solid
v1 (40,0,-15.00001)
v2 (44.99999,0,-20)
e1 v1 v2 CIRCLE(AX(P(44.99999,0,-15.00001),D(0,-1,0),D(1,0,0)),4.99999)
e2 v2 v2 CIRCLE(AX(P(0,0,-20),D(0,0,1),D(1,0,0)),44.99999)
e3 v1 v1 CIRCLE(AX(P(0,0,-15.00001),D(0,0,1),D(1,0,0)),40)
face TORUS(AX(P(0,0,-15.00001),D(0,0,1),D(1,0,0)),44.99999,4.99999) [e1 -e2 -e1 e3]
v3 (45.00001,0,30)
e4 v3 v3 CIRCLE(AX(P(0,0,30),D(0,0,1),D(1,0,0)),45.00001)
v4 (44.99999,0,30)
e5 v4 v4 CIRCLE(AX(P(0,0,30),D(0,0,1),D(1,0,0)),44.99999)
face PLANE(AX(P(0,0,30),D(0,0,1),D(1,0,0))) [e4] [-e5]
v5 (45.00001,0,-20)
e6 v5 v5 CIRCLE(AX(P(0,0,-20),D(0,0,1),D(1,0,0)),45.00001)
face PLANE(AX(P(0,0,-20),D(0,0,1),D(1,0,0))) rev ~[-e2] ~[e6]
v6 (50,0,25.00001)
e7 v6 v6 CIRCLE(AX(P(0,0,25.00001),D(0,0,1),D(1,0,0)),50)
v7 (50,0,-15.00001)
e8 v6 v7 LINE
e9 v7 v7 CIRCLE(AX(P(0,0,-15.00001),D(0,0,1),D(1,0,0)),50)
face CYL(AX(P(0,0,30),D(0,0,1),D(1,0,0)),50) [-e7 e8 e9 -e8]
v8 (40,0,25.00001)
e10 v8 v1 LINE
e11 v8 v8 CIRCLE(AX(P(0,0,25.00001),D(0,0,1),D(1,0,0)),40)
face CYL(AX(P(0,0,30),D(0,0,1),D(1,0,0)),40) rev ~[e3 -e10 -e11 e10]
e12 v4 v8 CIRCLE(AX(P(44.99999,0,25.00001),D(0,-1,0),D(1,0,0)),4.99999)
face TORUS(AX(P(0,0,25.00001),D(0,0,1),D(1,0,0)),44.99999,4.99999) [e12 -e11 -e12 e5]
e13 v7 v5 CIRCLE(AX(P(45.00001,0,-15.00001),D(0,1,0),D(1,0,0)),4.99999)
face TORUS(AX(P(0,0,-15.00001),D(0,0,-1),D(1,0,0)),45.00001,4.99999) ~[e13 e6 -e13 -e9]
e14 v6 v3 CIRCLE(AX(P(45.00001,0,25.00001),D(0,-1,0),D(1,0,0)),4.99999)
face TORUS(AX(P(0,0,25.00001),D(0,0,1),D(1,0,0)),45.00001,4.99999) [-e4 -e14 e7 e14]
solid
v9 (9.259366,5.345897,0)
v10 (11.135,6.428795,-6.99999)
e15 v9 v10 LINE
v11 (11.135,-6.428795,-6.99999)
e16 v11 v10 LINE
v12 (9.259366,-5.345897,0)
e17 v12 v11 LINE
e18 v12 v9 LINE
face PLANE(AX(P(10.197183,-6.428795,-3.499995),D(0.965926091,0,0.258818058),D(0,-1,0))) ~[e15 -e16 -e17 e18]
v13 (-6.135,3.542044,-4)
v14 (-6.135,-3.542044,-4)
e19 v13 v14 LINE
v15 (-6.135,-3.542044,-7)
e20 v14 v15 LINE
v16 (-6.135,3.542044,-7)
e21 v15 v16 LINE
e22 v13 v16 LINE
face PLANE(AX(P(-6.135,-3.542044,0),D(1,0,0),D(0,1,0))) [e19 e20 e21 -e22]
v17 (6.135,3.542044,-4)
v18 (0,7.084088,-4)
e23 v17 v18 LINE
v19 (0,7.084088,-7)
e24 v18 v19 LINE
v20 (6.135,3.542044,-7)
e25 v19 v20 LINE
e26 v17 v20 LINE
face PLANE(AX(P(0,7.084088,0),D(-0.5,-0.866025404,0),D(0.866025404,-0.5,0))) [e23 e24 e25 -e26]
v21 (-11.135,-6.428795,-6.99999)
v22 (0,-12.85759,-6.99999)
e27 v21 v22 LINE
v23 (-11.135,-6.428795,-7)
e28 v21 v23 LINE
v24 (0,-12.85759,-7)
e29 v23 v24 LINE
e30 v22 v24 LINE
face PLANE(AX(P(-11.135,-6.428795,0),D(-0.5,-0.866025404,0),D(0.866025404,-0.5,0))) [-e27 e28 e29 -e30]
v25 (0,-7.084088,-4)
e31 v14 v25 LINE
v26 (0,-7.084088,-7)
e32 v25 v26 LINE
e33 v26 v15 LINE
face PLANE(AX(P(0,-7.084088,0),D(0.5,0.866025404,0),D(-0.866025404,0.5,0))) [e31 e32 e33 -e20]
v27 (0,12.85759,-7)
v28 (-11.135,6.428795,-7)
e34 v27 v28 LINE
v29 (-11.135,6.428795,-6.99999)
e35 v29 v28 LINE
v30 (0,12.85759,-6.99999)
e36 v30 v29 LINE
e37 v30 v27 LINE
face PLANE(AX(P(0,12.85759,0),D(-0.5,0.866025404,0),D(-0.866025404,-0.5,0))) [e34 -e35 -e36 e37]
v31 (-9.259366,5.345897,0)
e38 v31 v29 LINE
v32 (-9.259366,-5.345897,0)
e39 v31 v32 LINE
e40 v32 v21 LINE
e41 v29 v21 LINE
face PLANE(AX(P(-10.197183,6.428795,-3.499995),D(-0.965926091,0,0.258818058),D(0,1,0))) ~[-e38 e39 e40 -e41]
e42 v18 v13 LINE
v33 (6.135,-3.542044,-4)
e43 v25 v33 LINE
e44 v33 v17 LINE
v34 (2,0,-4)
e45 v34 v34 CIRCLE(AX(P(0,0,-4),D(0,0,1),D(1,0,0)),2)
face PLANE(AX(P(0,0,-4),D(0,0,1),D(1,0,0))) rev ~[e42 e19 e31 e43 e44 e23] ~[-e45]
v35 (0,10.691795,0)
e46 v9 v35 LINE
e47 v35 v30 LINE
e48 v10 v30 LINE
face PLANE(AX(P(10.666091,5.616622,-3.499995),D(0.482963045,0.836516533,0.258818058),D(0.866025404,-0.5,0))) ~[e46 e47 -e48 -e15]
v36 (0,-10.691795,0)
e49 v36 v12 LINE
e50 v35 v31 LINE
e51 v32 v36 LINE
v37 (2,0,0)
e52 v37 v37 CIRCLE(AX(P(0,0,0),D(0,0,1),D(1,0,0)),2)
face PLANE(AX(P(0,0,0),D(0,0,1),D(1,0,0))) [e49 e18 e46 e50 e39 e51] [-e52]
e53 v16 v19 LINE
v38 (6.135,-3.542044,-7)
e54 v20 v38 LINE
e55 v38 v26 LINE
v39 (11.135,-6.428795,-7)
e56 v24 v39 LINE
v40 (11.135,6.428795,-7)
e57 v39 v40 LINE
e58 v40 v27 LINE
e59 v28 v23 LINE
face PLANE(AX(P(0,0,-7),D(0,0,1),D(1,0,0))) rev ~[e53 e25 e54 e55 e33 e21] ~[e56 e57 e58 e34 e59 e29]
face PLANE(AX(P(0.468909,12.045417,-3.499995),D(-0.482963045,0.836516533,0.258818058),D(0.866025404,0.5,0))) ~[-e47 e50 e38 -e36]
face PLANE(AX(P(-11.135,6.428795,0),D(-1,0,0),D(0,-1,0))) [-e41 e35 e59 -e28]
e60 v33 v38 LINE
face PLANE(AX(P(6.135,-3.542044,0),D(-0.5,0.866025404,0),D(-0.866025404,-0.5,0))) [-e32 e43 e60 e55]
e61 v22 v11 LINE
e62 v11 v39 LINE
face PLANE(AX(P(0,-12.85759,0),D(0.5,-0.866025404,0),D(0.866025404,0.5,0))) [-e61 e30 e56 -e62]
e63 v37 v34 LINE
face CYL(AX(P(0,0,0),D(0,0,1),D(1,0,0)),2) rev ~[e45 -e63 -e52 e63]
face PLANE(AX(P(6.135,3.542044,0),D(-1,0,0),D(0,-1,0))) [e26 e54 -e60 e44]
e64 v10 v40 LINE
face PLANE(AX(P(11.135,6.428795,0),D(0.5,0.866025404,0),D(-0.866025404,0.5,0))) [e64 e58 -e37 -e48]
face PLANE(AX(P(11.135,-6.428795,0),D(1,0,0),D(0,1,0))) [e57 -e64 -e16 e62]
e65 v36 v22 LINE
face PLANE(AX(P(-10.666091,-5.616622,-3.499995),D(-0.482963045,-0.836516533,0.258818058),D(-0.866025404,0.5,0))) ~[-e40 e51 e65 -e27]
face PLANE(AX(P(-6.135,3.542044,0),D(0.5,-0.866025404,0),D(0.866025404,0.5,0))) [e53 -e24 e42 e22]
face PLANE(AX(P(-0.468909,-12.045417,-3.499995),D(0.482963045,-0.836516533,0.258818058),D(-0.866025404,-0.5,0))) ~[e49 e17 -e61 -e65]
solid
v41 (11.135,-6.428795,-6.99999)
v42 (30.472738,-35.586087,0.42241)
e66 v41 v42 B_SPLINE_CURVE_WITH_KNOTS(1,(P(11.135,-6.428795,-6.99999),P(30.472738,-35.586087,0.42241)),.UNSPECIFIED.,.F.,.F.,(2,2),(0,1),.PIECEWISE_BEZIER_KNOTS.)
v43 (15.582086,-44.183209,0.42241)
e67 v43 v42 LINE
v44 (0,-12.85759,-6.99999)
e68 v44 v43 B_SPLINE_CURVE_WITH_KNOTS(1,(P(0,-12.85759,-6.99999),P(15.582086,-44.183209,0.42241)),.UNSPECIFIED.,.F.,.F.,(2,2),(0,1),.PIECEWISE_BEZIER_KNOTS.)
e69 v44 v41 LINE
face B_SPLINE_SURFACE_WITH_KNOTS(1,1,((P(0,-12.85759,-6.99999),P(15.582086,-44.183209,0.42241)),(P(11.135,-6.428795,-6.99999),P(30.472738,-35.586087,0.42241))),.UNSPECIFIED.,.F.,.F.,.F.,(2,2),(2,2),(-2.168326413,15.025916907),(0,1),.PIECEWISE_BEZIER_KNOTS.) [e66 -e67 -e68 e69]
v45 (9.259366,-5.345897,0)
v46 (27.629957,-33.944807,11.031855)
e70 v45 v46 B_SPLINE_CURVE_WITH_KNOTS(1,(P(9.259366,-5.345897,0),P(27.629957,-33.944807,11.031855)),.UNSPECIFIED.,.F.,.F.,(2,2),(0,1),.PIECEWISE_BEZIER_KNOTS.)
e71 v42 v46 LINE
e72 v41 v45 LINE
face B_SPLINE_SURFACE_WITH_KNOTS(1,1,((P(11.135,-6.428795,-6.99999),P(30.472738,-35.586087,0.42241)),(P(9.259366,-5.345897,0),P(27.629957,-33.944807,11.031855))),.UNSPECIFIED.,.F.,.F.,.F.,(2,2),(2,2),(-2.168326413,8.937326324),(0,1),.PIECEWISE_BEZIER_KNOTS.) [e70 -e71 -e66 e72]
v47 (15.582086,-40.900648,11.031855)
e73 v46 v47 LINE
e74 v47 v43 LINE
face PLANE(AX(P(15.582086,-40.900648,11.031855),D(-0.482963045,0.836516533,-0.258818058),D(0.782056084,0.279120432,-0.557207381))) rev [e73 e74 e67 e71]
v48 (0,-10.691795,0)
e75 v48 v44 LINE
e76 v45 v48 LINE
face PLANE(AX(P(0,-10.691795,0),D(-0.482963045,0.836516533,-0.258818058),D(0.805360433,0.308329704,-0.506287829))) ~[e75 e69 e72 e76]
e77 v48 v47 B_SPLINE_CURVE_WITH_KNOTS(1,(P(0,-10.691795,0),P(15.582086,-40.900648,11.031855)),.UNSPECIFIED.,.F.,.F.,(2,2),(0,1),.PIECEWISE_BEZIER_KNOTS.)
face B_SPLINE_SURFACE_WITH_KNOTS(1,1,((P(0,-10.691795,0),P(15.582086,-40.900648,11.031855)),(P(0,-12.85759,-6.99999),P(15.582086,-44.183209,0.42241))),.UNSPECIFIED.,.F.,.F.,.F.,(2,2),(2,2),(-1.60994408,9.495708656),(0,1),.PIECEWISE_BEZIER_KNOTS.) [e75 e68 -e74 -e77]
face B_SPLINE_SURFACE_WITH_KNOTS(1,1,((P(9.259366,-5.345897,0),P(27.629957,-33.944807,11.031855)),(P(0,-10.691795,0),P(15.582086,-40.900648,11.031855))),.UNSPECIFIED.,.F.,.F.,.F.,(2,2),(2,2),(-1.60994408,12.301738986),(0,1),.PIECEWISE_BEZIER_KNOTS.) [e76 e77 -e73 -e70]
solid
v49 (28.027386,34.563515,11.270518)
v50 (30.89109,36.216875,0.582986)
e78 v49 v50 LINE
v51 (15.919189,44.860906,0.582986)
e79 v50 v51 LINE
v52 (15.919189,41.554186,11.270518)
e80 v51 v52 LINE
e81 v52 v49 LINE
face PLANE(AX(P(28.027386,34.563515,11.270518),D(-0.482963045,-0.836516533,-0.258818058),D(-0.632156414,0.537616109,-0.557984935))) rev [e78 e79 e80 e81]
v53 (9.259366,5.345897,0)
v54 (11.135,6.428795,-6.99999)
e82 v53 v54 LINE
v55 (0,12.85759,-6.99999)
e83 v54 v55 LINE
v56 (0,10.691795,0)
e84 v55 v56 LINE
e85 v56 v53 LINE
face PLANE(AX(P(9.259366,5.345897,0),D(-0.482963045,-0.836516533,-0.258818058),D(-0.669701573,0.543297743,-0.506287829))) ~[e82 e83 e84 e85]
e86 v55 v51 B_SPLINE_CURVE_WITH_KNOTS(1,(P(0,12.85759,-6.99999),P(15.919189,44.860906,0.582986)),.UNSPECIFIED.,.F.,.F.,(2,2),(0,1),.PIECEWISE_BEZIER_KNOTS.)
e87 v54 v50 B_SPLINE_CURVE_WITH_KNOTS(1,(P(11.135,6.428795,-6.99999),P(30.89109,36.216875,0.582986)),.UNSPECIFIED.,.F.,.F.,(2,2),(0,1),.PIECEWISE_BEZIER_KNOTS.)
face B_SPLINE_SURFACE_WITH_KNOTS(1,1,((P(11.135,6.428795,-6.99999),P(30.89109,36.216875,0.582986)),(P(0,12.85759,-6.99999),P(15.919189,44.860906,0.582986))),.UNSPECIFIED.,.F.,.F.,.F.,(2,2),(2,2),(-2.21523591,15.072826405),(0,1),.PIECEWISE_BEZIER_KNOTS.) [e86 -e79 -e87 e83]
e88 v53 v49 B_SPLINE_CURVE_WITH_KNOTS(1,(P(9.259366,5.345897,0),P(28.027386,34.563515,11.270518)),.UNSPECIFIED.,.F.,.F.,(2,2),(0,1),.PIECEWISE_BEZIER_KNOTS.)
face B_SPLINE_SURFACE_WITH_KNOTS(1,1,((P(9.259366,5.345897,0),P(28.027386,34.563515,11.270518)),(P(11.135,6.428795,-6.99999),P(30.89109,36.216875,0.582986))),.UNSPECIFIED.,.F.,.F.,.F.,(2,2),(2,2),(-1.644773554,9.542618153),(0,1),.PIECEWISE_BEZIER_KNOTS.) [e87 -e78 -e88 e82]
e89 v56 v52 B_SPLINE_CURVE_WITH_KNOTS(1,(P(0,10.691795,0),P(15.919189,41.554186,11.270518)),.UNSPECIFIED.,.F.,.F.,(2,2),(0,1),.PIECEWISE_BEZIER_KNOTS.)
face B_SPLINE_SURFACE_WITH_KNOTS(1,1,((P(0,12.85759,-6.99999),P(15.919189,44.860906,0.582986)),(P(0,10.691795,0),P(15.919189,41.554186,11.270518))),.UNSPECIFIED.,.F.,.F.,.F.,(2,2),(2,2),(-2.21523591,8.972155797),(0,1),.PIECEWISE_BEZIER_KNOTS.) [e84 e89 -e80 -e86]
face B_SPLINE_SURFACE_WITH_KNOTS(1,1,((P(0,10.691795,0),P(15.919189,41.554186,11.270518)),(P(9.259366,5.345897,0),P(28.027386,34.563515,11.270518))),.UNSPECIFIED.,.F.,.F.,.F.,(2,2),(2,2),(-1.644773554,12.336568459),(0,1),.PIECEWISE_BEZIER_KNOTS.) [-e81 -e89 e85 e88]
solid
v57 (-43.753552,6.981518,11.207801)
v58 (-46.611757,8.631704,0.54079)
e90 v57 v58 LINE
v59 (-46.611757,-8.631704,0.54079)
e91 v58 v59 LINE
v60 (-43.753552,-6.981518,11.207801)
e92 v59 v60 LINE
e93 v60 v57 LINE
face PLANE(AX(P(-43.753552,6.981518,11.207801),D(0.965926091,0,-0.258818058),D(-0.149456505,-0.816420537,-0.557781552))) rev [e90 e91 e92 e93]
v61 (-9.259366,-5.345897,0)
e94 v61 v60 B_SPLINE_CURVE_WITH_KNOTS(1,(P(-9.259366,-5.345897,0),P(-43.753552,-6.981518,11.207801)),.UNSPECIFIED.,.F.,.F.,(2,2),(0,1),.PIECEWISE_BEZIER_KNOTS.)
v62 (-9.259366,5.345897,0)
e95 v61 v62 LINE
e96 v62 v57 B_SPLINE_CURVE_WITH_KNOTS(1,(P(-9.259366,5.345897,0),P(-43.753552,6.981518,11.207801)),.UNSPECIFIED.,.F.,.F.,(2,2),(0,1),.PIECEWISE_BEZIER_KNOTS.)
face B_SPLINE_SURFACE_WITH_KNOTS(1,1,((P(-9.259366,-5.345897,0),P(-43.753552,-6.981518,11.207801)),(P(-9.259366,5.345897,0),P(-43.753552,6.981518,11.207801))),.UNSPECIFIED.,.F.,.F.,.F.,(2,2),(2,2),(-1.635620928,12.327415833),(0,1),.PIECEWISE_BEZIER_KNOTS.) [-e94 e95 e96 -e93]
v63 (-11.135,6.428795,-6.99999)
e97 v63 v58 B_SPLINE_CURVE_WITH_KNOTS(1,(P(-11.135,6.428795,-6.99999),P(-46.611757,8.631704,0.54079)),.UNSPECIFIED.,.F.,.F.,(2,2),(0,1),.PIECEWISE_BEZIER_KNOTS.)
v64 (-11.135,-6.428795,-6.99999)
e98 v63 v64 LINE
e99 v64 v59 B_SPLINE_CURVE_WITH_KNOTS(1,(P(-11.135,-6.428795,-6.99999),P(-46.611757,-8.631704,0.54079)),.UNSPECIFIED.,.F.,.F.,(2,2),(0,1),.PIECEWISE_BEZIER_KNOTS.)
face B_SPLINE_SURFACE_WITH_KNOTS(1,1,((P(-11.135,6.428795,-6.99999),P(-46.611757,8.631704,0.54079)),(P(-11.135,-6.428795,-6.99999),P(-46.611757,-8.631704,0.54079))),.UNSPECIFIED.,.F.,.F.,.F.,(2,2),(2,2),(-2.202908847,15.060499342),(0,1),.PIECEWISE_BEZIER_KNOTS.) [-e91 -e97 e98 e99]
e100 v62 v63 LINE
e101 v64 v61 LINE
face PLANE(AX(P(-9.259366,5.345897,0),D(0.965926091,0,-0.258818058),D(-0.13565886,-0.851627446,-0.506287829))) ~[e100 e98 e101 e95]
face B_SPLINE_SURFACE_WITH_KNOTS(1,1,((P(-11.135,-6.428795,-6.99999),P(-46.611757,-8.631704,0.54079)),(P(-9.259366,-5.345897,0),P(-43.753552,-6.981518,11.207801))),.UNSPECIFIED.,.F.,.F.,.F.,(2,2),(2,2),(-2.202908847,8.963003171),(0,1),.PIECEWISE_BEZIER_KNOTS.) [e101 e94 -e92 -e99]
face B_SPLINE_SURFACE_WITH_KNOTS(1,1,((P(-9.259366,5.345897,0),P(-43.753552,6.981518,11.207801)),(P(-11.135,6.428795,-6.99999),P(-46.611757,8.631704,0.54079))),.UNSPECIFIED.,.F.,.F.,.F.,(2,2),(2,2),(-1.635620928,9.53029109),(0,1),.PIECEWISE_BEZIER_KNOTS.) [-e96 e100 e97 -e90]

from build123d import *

# Parameters (mm, degrees)
F2_R      = 50
F2_R_2    = 40
F3_DEPTH  = 50
F0_R      = 5.0478433235
F4_DEPTH  = 4
F5_DEPTH  = 7
F0_R_2    = 2
F6_DEPTH  = 58.6
F7_R      = 4.99999
F8_R      = 4.99999
F9_DEPTH  = 4
F10_SIZE2 = 6.99999
F10_SIZE  = 1.875634
F11_DEPTH = 36.4222936332
F11_TAPER = -3
F12_DEPTH = 35.6510207057
F12_TAPER = -3
F13_DEPTH = 36.2196154892
F13_TAPER = -3


# Not quite as in the source:
# - a fillet or chamfer is up to 0.001 mm smaller than in the source, because OpenCascade refuses the exact size


with BuildPart() as f3:
    # F2 (on offset) → F3 (new body)
    with BuildSketch(Plane.XY.offset(30)):
        Circle(F2_R)
        Circle(F2_R_2, mode=Mode.SUBTRACT)
    extrude(amount=-F3_DEPTH)

    # F0 (on Top) → F6 (cut)
    with BuildSketch(Plane.XY):
        Circle(F0_R_2)
    extrude(amount=F6_DEPTH, mode=Mode.SUBTRACT)

    # F7 (radius 5 in the source; OpenCascade refuses exactly that, so slightly less here)
    f7_edges = [f3.edges().sort_by_distance(p)[0] for p in [
        (-40, 0, -20),
        (-50, 0, -20),
    ]]
    fillet(f7_edges, radius=F7_R)

    # F8 (radius 5 in the source; OpenCascade refuses exactly that, so slightly less here)
    f8_edges = [f3.edges().sort_by_distance(p)[0] for p in [
        (-40, 0, 30),
        (-50, 0, 30),
    ]]
    fillet(f8_edges, radius=F8_R)


with BuildPart() as f4:
    # F0 (on Top) → F4 (new body)
    with BuildSketch(Plane.XY):
        Polygon((6.135, -3.5420439015), (6.135, 3.5420439015), (0, 7.084087803), (-6.135, 3.5420439015), (-6.135, -3.5420439015), (0, -7.084087803), align=None)
        Circle(F0_R, mode=Mode.SUBTRACT)
    extrude(amount=-F4_DEPTH)

    # F0 (on Top) → F5 (join)
    with BuildSketch(Plane.XY):
        Polygon((11.135, -6.4287952474), (11.135, 6.4287952474), (0, 12.8575904949), (-11.135, 6.4287952474), (-11.135, -6.4287952474), (0, -12.8575904949), align=None)
        Polygon((0, 7.084087803), (6.135, 3.5420439015), (6.135, -3.5420439015), (0, -7.084087803), (-6.135, -3.5420439015), (-6.135, 3.5420439015), align=None, mode=Mode.SUBTRACT)
    extrude(amount=-F5_DEPTH)

    # F0 (on Top) → F9 (join)
    with BuildSketch(Plane.XY):
        Circle(F0_R)
        Circle(F0_R_2, mode=Mode.SUBTRACT)
    extrude(amount=-F9_DEPTH)

    # F10 (size 1.875644347 and 7 in the source; OpenCascade refuses exactly that, so slightly less here)
    f10_edges = [f4.edges().sort_by_distance(p)[0] for p in [
        (-5.5675, -9.643193, 0),
        (5.5675, 9.643193, 0),
        (11.135, 0, 0),
        (-11.135, 0, 0),
        (-5.5675, 9.643193, 0),
        (5.5675, -9.643193, 0),
    ]]
    f10_side = f4.faces().sort_by_distance((5.39741, -9.348588, 0))[0]
    chamfer(f10_edges, length=F10_SIZE, length2=F10_SIZE2, reference=f10_side)


with BuildPart() as f11:
    # F10_face (on face) → F11 (new body)
    with BuildSketch(Plane(origin=(5.1129663969, 8.8559175768, -3.6072911298), x_dir=(-0.8660254038, 0.5, 0), z_dir=(0.4829630454, 0.8365165328, 0.2588180579))):
        Polygon((-5.3458974526, 3.7345415598), (-6.4287952474, -3.5123793658), (6.4287952474, -3.5123793658), (5.3458974526, 3.7345415598), align=None)
    extrude(amount=F11_DEPTH, taper=F11_TAPER)


with BuildPart() as f12:
    # F10_face1 (on face) → F12 (new body)
    with BuildSketch(Plane(origin=(5.1129663969, -8.8559175768, -3.6072911298), x_dir=(0.8660254038, 0.5, 0), z_dir=(0.4829630454, -0.8365165328, 0.2588180579))):
        Polygon((-5.3458974526, 3.7345415598), (-6.4287952474, -3.5123793658), (6.4287952474, -3.5123793658), (5.3458974526, 3.7345415598), align=None)
    extrude(amount=F12_DEPTH, taper=F12_TAPER)


with BuildPart() as f13:
    # F10_face2 (on face) → F13 (new body)
    with BuildSketch(Plane(origin=(-10.2259327938, 0, -3.6072911298), x_dir=(0, -1, 0), z_dir=(-0.9659260908, 0, 0.2588180579))):
        Polygon((-5.3458974526, 3.7345415598), (-6.4287952474, -3.5123793658), (6.4287952474, -3.5123793658), (5.3458974526, 3.7345415598), align=None)
    extrude(amount=F13_DEPTH, taper=F13_TAPER)


solid = Compound([f3.part, f4.part, f11.part, f12.part, f13.part])
